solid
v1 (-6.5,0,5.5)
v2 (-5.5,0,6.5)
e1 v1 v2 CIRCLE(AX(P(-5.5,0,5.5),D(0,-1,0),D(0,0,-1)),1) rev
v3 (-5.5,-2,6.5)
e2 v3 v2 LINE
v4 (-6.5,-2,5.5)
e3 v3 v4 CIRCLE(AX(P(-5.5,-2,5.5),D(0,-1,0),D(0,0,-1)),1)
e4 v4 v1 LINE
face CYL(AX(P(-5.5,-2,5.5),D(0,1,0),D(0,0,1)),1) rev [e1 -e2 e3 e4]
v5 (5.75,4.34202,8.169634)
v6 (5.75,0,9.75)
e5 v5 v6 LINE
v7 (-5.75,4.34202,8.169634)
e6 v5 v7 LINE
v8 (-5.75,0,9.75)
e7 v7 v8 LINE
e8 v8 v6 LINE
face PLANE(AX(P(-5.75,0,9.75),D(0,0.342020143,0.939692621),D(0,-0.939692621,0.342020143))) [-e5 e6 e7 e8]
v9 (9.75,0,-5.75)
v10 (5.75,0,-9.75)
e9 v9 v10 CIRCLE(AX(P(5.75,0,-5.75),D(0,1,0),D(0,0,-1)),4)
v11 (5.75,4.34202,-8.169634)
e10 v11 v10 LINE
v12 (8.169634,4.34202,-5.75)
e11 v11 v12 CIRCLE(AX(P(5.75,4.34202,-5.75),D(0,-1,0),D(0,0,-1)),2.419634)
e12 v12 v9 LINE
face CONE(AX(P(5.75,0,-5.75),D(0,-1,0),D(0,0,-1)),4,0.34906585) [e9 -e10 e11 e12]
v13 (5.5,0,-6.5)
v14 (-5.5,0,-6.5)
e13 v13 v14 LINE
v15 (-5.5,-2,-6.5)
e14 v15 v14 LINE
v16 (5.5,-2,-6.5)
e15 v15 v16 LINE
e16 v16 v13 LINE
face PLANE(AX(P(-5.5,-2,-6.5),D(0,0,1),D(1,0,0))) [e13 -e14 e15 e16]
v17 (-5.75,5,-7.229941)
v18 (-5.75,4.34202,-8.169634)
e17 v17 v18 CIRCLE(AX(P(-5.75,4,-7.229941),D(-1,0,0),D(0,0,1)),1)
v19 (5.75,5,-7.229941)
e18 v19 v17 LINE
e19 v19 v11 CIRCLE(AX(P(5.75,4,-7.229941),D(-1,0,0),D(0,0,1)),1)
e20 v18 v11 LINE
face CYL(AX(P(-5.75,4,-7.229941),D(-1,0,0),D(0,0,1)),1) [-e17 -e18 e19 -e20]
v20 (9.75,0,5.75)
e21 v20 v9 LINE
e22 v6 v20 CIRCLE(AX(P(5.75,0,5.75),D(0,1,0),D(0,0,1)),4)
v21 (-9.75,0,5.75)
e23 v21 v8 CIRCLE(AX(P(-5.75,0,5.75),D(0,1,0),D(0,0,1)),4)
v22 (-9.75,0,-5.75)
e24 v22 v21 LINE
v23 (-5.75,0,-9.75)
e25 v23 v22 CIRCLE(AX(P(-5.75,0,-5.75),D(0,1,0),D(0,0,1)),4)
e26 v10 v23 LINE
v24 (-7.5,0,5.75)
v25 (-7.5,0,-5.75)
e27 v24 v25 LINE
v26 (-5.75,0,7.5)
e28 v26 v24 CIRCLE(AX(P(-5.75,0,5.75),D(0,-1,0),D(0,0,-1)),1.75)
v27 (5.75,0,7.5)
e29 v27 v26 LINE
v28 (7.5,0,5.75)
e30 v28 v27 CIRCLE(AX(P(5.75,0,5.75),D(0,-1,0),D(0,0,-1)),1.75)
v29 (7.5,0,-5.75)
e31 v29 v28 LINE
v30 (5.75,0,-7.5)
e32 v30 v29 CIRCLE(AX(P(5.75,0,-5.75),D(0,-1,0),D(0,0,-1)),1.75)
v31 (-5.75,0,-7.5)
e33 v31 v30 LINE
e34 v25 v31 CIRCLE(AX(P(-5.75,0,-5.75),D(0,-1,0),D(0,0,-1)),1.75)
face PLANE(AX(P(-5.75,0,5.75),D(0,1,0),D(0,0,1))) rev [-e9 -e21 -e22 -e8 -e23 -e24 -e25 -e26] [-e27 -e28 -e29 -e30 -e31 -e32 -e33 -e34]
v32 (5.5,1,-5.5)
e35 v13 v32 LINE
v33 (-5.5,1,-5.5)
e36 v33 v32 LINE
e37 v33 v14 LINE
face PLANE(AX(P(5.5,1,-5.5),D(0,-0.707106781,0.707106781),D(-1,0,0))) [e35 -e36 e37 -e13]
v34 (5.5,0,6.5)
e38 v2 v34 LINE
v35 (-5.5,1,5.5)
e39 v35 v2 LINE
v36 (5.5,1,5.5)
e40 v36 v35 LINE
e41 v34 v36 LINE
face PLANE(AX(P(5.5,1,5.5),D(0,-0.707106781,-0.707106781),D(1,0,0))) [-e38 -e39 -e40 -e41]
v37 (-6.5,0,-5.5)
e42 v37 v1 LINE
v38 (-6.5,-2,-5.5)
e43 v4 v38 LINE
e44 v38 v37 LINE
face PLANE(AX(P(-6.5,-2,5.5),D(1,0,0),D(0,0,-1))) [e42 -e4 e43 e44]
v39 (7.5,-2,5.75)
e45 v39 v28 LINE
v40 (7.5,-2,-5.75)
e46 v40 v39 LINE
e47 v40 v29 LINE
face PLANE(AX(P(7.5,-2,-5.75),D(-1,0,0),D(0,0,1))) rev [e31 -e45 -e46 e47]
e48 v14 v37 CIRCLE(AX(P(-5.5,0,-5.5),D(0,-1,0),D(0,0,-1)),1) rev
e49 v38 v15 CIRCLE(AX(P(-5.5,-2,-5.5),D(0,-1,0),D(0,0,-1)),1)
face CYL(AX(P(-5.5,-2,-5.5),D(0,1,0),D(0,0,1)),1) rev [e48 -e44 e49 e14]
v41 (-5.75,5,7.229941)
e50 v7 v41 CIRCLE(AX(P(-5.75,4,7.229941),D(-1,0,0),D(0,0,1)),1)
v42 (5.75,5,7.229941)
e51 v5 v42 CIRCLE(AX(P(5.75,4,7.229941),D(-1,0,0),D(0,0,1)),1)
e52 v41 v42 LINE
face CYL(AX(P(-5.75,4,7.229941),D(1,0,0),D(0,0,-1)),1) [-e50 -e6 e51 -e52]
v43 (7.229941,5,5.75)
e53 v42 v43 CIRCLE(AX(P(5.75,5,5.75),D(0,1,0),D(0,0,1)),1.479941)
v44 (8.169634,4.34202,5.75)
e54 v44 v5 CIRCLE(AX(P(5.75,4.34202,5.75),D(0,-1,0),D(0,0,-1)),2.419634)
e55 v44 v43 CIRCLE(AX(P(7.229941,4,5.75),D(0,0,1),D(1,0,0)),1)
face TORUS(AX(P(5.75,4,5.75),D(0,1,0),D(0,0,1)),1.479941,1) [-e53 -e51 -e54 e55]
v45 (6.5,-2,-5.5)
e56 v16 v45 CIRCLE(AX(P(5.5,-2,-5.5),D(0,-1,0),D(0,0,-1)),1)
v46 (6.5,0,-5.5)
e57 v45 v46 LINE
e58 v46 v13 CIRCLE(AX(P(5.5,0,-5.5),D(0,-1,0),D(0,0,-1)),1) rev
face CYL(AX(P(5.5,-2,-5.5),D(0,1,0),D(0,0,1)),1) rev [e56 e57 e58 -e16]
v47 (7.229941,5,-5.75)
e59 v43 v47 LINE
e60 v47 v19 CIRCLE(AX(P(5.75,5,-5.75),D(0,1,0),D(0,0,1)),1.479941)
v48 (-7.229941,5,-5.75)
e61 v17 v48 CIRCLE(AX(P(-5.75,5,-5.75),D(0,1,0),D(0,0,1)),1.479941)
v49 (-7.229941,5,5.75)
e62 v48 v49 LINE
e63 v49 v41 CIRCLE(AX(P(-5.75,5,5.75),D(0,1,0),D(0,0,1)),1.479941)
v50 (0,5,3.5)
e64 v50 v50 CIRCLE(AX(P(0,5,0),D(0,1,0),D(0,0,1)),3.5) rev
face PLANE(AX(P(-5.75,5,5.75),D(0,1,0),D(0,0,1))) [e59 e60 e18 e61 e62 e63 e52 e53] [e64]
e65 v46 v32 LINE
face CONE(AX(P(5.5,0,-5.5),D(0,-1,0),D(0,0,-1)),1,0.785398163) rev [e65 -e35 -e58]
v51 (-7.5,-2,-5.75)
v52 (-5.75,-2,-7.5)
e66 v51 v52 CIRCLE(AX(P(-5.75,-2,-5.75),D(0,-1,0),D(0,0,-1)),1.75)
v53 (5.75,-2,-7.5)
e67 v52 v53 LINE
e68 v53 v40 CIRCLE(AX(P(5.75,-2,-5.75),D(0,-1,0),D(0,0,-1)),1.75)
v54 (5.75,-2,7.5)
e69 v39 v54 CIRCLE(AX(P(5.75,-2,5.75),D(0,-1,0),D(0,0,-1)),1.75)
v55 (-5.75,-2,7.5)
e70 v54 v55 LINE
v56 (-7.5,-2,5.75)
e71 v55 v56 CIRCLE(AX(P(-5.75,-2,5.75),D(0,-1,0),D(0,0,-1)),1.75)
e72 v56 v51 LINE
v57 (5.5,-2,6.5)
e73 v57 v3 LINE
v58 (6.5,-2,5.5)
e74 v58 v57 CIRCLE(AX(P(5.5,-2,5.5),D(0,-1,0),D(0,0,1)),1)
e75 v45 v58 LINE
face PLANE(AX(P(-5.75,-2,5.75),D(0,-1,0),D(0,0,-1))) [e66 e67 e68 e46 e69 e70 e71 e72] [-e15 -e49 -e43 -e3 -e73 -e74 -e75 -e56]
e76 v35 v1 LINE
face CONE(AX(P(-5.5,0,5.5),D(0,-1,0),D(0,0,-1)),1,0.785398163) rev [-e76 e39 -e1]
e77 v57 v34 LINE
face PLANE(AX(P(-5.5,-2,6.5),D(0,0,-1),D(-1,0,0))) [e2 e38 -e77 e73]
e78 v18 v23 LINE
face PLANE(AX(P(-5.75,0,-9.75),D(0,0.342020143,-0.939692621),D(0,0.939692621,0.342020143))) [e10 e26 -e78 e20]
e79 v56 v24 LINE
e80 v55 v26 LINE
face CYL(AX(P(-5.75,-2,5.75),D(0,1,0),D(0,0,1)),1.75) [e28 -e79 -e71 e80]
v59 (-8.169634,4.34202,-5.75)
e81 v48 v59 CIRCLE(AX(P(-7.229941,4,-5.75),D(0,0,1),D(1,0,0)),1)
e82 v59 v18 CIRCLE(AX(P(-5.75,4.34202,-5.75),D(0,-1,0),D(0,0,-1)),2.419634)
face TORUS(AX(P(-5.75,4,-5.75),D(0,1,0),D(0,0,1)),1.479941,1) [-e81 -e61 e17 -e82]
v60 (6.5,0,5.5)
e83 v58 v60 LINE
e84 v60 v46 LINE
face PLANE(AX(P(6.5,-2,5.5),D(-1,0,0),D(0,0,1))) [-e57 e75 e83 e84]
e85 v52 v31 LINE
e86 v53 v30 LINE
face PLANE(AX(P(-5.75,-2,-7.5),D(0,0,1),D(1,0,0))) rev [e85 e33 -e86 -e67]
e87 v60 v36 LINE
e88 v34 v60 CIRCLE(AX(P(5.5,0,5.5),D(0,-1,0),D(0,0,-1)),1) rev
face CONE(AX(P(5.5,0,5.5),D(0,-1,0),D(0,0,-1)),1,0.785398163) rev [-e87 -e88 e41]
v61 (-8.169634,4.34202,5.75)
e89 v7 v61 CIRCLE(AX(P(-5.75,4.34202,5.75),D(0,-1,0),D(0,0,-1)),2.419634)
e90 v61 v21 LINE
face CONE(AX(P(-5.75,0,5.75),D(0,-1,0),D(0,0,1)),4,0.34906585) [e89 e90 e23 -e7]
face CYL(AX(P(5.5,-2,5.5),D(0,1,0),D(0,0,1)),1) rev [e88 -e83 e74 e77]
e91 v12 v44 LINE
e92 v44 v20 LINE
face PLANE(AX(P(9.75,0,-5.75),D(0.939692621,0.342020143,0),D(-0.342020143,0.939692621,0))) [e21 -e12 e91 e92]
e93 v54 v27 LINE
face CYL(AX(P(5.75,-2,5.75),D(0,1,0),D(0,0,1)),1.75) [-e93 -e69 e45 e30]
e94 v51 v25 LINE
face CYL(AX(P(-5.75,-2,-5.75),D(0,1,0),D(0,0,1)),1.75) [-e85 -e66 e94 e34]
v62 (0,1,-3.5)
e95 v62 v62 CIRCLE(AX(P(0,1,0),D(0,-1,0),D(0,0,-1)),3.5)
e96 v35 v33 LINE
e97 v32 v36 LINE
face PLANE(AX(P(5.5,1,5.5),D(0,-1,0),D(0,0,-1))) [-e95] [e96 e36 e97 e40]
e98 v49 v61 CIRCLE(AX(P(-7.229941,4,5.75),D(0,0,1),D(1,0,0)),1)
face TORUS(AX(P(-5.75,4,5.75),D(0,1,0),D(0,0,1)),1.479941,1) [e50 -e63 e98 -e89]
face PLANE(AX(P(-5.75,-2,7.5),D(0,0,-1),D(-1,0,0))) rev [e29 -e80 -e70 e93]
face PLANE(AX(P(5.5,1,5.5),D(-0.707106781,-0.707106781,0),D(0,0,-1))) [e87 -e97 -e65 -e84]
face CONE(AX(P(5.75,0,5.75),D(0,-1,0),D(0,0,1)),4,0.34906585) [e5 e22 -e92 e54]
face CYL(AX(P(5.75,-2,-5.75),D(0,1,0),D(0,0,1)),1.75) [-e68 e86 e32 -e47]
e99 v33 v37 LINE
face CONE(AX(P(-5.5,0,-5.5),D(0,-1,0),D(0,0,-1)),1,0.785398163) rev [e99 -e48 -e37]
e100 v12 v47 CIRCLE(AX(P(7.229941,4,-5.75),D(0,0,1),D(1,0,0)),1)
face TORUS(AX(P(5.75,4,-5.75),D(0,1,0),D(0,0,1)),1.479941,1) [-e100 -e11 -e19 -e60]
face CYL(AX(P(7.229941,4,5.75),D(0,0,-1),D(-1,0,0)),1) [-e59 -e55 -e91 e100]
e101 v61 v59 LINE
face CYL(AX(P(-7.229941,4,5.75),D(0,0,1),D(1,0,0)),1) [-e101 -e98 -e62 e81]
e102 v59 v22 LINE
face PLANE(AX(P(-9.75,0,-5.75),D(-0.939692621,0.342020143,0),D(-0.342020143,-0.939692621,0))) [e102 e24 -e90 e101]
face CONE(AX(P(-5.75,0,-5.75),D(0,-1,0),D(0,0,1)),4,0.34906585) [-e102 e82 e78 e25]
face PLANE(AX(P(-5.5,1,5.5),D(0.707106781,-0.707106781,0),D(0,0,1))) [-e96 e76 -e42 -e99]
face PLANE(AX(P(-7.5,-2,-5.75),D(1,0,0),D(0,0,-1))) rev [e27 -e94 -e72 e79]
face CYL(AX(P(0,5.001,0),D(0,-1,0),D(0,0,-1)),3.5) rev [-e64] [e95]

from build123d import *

# Parameters (mm, degrees)
BOSS_EXTRUDE1_DEPTH = 5
BOSS_EXTRUDE1_TAPER = 20
BOSS_EXTRUDE2_DEPTH = 2
CUT_EXTRUDE1_START  = -1
CUT_EXTRUDE1_DEPTH  = 1
CHAMFER1_SIZE       = 1
CUT_EXTRUDE2_REACH  = 16.357
SKETCH4_R           = 3.5
FILLET1_R           = 1


with BuildPart() as part:
    # Sketch1 → Boss-Extrude1 (new body)
    with BuildSketch(Plane(origin=(0, 0, 0), x_dir=(1, 0, 0), z_dir=(0, 1, 0))):
        with BuildLine():
            ThreePointArc((-5.75, 9.75), (-8.578427125, 8.578427125), (-9.75, 5.75))
            Line((-9.75, 5.75), (-9.75, -5.75))
            ThreePointArc((-9.75, -5.75), (-8.578427125, -8.578427125), (-5.75, -9.75))
            Line((-5.75, -9.75), (5.75, -9.75))
            ThreePointArc((5.75, -9.75), (8.578427125, -8.578427125), (9.75, -5.75))
            Line((9.75, -5.75), (9.75, 5.75))
            ThreePointArc((9.75, 5.75), (8.578427125, 8.578427125), (5.75, 9.75))
            Line((5.75, 9.75), (-5.75, 9.75))
        make_face()
    extrude(amount=BOSS_EXTRUDE1_DEPTH, taper=BOSS_EXTRUDE1_TAPER)

    # Sketch2 → Boss-Extrude2 (add)
    with BuildSketch(Plane.XZ):
        with BuildLine():
            Line((-5.75, 7.5), (5.75, 7.5))
            ThreePointArc((5.75, 7.5), (6.987436867, 6.987436867), (7.5, 5.75))
            Line((7.5, 5.75), (7.5, -5.75))
            ThreePointArc((7.5, -5.75), (6.987436867, -6.987436867), (5.75, -7.5))
            Line((5.75, -7.5), (-5.75, -7.5))
            ThreePointArc((-5.75, -7.5), (-6.987436867, -6.987436867), (-7.5, -5.75))
            Line((-7.5, -5.75), (-7.5, 5.75))
            ThreePointArc((-7.5, 5.75), (-6.987436867, 6.987436867), (-5.75, 7.5))
        make_face()
        with BuildLine():
            Line((-5.5, 6.5), (5.5, 6.5))
            ThreePointArc((5.5, 6.5), (6.207106781, 6.207106781), (6.5, 5.5))
            Line((6.5, 5.5), (6.5, -5.5))
            ThreePointArc((6.5, -5.5), (6.207106781, -6.207106781), (5.5, -6.5))
            Line((5.5, -6.5), (-5.5, -6.5))
            ThreePointArc((-5.5, -6.5), (-6.207106781, -6.207106781), (-6.5, -5.5))
            Line((-6.5, -5.5), (-6.5, 5.5))
            ThreePointArc((-6.5, 5.5), (-6.207106781, 6.207106781), (-5.5, 6.5))
        make_face(mode=Mode.SUBTRACT)
    extrude(amount=BOSS_EXTRUDE2_DEPTH)

    # Sketch3 → Cut-Extrude1 (cut)
    with BuildSketch(Plane.XZ.offset(CUT_EXTRUDE1_START)):
        with BuildLine():
            Line((5.5, 6.5), (-5.5, 6.5))
            ThreePointArc((-5.5, 6.5), (-6.207106781, 6.207106781), (-6.5, 5.5))
            Line((-6.5, 5.5), (-6.5, -5.5))
            ThreePointArc((-6.5, -5.5), (-6.207106781, -6.207106781), (-5.5, -6.5))
            Line((-5.5, -6.5), (5.5, -6.5))
            ThreePointArc((5.5, -6.5), (6.207106781, -6.207106781), (6.5, -5.5))
            Line((6.5, -5.5), (6.5, 5.5))
            ThreePointArc((6.5, 5.5), (6.207106781, 6.207106781), (5.5, 6.5))
        make_face()
    extrude(amount=CUT_EXTRUDE1_DEPTH, mode=Mode.SUBTRACT)

    # Chamfer1
    chamfer1_edges = [part.edges().sort_by_distance(p)[0] for p in [
        (6.207106781, 1, 6.207106781),
        (6.5, 1, 0),
        (6.207106781, 1, -6.207106781),
        (0, 1, -6.5),
        (-6.207106781, 1, -6.207106781),
        (-6.5, 1, 0),
        (-6.207106781, 1, 6.207106781),
        (0, 1, 6.5),
    ]]
    chamfer(chamfer1_edges, length=CHAMFER1_SIZE - 0.0001)  # a hair under: the kernel refuses the full size

    # Sketch4 → Cut-Extrude2 (cut, up to next)
    with BuildSketch(Plane.XZ.offset(-1), mode=Mode.PRIVATE) as cut_extrude2_sk1:
        with Locations(Location((0, 0, 0), (0, 0, 270))):
            Circle(SKETCH4_R)
    cut_extrude2_tool1 = extrude(cut_extrude2_sk1.sketch, amount=-CUT_EXTRUDE2_REACH, mode=Mode.PRIVATE) & part.part
    add(cut_extrude2_tool1.solids().sort_by_distance((0, 1, 0))[0], mode=Mode.SUBTRACT)

    # Fillet1
    fillet1_edges = [part.edges().sort_by_distance(p)[0] for p in [
        (7.291598021, 5, 7.291598021),
        (7.930148829, 5, 0),
        (7.291598021, 5, -7.291598021),
        (0, 5, -7.930148829),
        (-7.291598021, 5, -7.291598021),
        (-7.930148829, 5, 0),
        (-7.291598021, 5, 7.291598021),
        (0, 5, 7.930148829),
    ]]
    fillet(fillet1_edges, radius=FILLET1_R)


solid = part.part
